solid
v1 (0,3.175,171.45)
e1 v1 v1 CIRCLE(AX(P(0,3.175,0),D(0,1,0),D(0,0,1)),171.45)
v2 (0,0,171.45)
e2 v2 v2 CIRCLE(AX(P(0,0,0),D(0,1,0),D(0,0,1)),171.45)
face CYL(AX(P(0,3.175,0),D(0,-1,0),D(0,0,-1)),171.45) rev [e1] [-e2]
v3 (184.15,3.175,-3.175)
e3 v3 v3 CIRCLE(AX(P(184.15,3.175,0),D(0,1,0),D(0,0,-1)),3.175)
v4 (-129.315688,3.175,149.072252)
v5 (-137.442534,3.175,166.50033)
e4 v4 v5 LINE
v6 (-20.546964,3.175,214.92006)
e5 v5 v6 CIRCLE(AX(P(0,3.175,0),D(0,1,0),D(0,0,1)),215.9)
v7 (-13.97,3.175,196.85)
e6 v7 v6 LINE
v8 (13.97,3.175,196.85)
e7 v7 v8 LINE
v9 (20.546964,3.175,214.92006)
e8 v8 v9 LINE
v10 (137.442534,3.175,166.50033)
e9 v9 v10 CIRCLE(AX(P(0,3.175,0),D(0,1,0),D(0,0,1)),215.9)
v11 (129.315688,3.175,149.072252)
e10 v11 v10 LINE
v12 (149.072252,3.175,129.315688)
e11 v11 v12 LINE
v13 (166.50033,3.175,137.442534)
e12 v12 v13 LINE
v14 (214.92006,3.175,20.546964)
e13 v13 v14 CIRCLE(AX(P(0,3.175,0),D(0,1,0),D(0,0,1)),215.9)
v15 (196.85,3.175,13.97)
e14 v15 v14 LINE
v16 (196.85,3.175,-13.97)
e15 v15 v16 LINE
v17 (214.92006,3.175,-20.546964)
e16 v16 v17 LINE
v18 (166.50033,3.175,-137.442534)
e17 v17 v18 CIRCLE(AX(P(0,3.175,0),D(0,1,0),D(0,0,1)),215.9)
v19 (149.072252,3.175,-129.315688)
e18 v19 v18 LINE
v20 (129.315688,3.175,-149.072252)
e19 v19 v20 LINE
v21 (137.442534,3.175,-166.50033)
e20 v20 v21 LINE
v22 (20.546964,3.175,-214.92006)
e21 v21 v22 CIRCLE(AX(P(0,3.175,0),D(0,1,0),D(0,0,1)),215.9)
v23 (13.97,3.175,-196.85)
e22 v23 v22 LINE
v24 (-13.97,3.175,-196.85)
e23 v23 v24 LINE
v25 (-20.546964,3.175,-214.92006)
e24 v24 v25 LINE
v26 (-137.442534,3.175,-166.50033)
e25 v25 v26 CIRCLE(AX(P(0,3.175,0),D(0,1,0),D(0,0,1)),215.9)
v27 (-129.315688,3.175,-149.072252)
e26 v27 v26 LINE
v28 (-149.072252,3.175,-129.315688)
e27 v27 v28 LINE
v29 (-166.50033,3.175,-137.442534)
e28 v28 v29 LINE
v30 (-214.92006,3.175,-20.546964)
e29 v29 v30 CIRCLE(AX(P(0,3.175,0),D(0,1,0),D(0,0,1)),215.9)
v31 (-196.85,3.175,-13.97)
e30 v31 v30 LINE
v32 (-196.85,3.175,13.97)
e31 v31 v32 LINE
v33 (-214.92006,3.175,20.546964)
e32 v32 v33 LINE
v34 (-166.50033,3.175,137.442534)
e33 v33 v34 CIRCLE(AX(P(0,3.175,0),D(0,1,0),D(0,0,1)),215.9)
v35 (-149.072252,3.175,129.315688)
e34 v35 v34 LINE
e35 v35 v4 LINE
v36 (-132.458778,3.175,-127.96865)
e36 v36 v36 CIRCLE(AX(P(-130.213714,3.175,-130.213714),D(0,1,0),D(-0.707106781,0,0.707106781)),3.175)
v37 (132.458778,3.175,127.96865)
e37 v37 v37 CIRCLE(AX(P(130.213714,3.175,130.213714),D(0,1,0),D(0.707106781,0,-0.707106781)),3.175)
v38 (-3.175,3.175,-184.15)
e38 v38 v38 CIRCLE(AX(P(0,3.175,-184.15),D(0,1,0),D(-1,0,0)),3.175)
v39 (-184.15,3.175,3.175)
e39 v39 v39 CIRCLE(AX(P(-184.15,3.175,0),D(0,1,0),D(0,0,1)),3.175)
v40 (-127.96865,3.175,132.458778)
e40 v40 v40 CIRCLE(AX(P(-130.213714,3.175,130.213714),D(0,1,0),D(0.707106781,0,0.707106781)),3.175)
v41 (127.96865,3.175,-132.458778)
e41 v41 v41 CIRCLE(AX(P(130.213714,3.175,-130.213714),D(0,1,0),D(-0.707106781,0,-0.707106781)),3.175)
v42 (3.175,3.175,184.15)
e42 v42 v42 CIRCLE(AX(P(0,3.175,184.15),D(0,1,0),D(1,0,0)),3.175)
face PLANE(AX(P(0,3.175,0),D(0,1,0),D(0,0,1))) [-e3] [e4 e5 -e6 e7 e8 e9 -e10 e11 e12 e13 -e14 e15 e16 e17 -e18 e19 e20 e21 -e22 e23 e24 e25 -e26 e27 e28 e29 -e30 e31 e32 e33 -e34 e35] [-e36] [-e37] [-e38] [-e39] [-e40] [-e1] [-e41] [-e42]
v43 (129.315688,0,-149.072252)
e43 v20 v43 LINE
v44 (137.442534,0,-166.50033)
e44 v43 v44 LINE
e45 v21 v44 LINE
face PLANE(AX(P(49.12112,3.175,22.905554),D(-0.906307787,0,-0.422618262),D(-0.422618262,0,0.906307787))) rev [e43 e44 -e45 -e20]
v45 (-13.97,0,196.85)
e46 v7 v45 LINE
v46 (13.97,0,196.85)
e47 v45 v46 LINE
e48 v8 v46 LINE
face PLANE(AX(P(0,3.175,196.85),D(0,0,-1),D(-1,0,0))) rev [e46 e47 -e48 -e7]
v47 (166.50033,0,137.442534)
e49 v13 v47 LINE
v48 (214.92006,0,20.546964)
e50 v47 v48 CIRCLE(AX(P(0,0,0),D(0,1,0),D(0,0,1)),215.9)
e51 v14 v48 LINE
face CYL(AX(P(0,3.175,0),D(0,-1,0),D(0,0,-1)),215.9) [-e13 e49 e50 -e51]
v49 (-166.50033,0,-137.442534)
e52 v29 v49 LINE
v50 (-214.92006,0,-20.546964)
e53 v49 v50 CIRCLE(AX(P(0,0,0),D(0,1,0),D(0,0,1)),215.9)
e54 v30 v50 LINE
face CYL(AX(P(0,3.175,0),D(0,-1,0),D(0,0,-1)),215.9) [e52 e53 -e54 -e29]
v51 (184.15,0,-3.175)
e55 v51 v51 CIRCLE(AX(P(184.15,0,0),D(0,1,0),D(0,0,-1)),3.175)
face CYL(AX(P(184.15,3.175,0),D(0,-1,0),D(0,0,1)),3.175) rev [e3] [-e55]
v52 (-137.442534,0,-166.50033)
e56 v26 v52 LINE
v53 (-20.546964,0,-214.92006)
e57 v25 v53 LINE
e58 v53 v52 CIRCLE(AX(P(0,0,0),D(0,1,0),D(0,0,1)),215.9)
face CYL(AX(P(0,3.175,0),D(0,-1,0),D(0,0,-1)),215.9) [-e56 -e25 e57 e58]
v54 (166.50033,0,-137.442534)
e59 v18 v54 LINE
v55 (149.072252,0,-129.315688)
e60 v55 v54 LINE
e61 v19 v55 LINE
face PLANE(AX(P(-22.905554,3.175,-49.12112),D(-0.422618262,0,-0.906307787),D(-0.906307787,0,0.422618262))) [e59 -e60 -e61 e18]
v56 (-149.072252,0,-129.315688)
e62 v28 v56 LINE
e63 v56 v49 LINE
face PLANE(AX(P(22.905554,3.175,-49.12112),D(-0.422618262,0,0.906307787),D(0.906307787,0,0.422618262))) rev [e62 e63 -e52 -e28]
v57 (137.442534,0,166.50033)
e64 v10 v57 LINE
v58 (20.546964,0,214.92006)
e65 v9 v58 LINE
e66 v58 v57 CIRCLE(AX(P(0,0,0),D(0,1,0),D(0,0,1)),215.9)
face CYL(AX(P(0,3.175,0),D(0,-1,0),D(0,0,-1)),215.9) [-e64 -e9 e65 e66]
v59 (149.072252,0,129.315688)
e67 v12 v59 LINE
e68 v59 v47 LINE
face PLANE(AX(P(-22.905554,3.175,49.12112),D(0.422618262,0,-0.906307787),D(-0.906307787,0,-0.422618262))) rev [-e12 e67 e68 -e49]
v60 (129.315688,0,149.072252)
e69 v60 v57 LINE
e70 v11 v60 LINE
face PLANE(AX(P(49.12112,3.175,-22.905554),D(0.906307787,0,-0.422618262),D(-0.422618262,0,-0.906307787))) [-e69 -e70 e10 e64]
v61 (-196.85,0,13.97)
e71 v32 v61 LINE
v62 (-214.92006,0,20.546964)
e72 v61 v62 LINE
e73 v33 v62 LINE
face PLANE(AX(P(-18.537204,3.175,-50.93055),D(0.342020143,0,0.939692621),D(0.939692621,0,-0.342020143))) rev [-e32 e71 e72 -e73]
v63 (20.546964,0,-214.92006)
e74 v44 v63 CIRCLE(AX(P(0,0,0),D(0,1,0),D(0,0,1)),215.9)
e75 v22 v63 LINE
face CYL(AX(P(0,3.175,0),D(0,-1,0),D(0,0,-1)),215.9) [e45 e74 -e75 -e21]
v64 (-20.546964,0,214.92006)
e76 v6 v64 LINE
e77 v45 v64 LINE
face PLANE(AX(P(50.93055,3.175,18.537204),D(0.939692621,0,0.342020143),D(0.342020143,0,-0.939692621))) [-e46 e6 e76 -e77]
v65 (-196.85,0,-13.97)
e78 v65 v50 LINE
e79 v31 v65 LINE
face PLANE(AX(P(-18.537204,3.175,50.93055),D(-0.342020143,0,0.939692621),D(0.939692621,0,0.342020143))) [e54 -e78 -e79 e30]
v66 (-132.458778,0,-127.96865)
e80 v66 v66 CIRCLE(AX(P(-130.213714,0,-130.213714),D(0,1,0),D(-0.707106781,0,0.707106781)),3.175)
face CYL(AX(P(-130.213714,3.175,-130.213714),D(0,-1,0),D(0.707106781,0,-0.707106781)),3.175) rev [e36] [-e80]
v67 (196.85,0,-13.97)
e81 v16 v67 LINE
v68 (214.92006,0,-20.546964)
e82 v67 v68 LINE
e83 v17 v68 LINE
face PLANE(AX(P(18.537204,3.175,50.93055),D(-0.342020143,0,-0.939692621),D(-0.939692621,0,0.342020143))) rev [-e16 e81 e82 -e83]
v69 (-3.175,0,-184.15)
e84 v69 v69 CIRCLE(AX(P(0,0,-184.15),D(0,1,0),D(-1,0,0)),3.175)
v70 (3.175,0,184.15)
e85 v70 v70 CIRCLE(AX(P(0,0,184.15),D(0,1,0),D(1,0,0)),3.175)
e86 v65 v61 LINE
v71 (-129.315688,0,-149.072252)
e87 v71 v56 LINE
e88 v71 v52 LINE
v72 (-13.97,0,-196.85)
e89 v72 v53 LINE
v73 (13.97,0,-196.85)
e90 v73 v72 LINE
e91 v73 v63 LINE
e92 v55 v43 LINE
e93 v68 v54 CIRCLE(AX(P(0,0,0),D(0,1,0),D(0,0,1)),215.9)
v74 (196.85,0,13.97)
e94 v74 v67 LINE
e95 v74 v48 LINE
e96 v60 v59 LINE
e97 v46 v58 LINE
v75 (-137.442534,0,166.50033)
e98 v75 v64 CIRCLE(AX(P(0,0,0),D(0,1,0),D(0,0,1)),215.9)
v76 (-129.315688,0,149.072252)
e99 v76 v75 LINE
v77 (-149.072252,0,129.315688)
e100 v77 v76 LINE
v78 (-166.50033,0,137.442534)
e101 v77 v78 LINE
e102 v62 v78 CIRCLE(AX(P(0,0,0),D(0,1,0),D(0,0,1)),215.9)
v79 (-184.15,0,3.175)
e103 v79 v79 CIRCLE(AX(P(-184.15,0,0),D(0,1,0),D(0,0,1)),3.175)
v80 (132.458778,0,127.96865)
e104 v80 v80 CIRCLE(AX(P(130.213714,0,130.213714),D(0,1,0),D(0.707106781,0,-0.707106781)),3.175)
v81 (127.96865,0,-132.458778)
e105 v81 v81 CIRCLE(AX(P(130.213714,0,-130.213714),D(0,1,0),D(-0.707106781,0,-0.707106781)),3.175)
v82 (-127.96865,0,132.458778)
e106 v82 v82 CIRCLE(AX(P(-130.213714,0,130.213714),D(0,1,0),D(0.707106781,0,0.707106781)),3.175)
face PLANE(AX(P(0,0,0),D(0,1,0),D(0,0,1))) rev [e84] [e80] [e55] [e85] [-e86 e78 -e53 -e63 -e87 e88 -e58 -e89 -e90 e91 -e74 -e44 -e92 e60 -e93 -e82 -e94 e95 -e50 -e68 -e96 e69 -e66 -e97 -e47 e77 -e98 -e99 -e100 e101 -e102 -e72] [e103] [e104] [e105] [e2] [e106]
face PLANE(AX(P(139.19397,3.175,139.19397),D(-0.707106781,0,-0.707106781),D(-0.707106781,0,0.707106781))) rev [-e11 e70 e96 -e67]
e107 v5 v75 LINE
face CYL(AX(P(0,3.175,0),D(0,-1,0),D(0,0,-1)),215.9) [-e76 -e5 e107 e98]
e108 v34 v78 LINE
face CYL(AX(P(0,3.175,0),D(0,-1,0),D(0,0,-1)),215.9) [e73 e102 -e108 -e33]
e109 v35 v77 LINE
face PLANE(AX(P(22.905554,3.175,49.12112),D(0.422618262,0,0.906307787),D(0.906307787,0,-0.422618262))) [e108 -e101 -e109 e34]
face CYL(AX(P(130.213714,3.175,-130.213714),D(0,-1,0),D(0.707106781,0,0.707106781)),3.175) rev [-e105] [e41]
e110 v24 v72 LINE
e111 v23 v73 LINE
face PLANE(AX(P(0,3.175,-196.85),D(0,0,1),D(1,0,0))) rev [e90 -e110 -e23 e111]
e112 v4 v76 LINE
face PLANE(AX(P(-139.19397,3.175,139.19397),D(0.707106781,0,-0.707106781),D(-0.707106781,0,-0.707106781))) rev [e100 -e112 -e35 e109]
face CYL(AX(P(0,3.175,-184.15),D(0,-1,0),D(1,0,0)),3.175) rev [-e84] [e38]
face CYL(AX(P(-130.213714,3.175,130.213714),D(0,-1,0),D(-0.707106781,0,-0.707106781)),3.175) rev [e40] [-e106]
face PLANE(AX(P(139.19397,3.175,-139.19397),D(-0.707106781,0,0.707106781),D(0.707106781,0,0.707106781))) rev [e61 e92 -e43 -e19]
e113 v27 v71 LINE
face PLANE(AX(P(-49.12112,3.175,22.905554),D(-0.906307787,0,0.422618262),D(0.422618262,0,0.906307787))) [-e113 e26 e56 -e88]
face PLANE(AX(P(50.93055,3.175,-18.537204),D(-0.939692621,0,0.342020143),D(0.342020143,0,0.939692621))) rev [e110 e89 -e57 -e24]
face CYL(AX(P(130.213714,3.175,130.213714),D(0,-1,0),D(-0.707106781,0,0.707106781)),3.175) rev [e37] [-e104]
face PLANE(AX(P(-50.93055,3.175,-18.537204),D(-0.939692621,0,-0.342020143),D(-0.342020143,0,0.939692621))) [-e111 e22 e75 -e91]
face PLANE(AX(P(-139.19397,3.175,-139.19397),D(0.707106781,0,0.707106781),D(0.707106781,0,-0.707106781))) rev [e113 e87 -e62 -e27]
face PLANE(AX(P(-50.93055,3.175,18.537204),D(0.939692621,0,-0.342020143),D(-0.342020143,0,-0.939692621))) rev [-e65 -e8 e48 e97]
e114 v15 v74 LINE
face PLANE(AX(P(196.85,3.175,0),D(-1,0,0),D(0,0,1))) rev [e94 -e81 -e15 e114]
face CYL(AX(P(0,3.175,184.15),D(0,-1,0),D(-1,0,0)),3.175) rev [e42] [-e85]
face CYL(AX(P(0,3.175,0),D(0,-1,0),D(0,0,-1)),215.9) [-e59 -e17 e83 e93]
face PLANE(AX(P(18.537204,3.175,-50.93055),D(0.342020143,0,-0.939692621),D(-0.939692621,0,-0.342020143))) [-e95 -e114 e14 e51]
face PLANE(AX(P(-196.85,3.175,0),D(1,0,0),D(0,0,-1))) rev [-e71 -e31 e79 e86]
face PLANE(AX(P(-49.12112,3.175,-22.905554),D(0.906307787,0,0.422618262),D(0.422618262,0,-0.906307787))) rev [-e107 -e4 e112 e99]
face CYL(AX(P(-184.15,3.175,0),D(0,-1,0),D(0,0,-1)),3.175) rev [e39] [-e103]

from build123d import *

# Parameters (mm, degrees)
SKETCH2_R             = 3.175
SKETCH2_R_2           = 171.45
BOSS_EXTRUDE1_DEPTH   = 3.175
CIRPATTERN1_OUTLINE_R = 3.175
CIRPATTERN1_DEPTH     = 3.175


# Read off the part's stored shape, not the designer's step: CirPattern1
with BuildPart() as part:
    # Sketch2 → Boss-Extrude1 (new body)
    with BuildSketch(Plane(origin=(0, 0, 0), x_dir=(1, 0, 0), z_dir=(0, 1, 0))):
        with BuildLine():
            Line((-214.920060182, 20.546964038), (-196.85, 13.97))
            Line((-196.85, 13.97), (-196.85, -13.97))
            Line((-196.85, -13.97), (-214.920060182, -20.546964038))
            ThreePointArc((-214.920060182, -20.546964038), (10.285159372, -215.654875894), (215.9, 0))
            ThreePointArc((215.9, 0), (10.285159372, 215.654875894), (-214.920060182, 20.546964038))
        make_face()
        with Locations(Location((-184.15, 0, 0), (0, 0, 270))):
            Circle(SKETCH2_R, mode=Mode.SUBTRACT)
        with Locations(Location((0, 0, 0), (0, 0, 270))):
            Circle(SKETCH2_R_2, mode=Mode.SUBTRACT)
    extrude(amount=BOSS_EXTRUDE1_DEPTH)

    # CirPattern1 outline → CirPattern1 (cut)
    with BuildSketch(Plane(origin=(0, 0, 0), x_dir=(1, 0, 0), z_dir=(0, 1, 0))):
        with BuildLine():
            Line((-129.315688143, 149.07225161), (-137.442534364, 166.500329572))
            ThreePointArc((-137.442534364, 166.500329572), (-152.664354058, 152.664354058), (-166.500329572, 137.442534364))
            Line((-166.500329572, 137.442534364), (-149.07225161, 129.315688143))
            Line((-149.07225161, 129.315688143), (-129.315688143, 149.07225161))
        make_face()
        with BuildLine():
            ThreePointArc((-166.500329572, -137.442534364), (-152.664354058, -152.664354058), (-137.442534364, -166.500329572))
            Line((-137.442534364, -166.500329572), (-129.315688143, -149.07225161))
            Line((-129.315688143, -149.07225161), (-149.07225161, -129.315688143))
            Line((-149.07225161, -129.315688143), (-166.500329572, -137.442534364))
        make_face()
        with BuildLine():
            ThreePointArc((-20.546964038, -214.920060182), (0, -215.9), (20.546964038, -214.920060182))
            Line((20.546964038, -214.920060182), (13.97, -196.85))
            Line((13.97, -196.85), (-13.97, -196.85))
            Line((-13.97, -196.85), (-20.546964038, -214.920060182))
        make_face()
        with BuildLine():
            ThreePointArc((137.442534364, -166.500329572), (152.664354058, -152.664354058), (166.500329572, -137.442534364))
            Line((166.500329572, -137.442534364), (149.07225161, -129.315688143))
            Line((149.07225161, -129.315688143), (129.315688143, -149.07225161))
            Line((129.315688143, -149.07225161), (137.442534364, -166.500329572))
        make_face()
        with BuildLine():
            ThreePointArc((214.920060182, -20.546964038), (215.9, 0), (214.920060182, 20.546964038))
            Line((214.920060182, 20.546964038), (196.85, 13.97))
            Line((196.85, 13.97), (196.85, -13.97))
            Line((196.85, -13.97), (214.920060182, -20.546964038))
        make_face()
        with BuildLine():
            ThreePointArc((166.500329572, 137.442534364), (152.664354058, 152.664354058), (137.442534364, 166.500329572))
            Line((137.442534364, 166.500329572), (129.315688143, 149.07225161))
            Line((129.315688143, 149.07225161), (149.07225161, 129.315688143))
            Line((149.07225161, 129.315688143), (166.500329572, 137.442534364))
        make_face()
        with BuildLine():
            ThreePointArc((20.546964038, 214.920060182), (0, 215.9), (-20.546964038, 214.920060182))
            Line((-20.546964038, 214.920060182), (-13.97, 196.85))
            Line((-13.97, 196.85), (13.97, 196.85))
            Line((13.97, 196.85), (20.546964038, 214.920060182))
        make_face()
        with Locations((-130.213713756, 130.213713756)):
            Circle(CIRPATTERN1_OUTLINE_R)
        with Locations((0, 184.15)):
            Circle(CIRPATTERN1_OUTLINE_R)
        with Locations((130.213713756, 130.213713756)):
            Circle(CIRPATTERN1_OUTLINE_R)
        with Locations((184.15, 0)):
            Circle(CIRPATTERN1_OUTLINE_R)
        with Locations((130.213713756, -130.213713756)):
            Circle(CIRPATTERN1_OUTLINE_R)
        with Locations((0, -184.15)):
            Circle(CIRPATTERN1_OUTLINE_R)
        with Locations((-130.213713756, -130.213713756)):
            Circle(CIRPATTERN1_OUTLINE_R)
    extrude(amount=CIRPATTERN1_DEPTH, mode=Mode.SUBTRACT)


solid = part.part
